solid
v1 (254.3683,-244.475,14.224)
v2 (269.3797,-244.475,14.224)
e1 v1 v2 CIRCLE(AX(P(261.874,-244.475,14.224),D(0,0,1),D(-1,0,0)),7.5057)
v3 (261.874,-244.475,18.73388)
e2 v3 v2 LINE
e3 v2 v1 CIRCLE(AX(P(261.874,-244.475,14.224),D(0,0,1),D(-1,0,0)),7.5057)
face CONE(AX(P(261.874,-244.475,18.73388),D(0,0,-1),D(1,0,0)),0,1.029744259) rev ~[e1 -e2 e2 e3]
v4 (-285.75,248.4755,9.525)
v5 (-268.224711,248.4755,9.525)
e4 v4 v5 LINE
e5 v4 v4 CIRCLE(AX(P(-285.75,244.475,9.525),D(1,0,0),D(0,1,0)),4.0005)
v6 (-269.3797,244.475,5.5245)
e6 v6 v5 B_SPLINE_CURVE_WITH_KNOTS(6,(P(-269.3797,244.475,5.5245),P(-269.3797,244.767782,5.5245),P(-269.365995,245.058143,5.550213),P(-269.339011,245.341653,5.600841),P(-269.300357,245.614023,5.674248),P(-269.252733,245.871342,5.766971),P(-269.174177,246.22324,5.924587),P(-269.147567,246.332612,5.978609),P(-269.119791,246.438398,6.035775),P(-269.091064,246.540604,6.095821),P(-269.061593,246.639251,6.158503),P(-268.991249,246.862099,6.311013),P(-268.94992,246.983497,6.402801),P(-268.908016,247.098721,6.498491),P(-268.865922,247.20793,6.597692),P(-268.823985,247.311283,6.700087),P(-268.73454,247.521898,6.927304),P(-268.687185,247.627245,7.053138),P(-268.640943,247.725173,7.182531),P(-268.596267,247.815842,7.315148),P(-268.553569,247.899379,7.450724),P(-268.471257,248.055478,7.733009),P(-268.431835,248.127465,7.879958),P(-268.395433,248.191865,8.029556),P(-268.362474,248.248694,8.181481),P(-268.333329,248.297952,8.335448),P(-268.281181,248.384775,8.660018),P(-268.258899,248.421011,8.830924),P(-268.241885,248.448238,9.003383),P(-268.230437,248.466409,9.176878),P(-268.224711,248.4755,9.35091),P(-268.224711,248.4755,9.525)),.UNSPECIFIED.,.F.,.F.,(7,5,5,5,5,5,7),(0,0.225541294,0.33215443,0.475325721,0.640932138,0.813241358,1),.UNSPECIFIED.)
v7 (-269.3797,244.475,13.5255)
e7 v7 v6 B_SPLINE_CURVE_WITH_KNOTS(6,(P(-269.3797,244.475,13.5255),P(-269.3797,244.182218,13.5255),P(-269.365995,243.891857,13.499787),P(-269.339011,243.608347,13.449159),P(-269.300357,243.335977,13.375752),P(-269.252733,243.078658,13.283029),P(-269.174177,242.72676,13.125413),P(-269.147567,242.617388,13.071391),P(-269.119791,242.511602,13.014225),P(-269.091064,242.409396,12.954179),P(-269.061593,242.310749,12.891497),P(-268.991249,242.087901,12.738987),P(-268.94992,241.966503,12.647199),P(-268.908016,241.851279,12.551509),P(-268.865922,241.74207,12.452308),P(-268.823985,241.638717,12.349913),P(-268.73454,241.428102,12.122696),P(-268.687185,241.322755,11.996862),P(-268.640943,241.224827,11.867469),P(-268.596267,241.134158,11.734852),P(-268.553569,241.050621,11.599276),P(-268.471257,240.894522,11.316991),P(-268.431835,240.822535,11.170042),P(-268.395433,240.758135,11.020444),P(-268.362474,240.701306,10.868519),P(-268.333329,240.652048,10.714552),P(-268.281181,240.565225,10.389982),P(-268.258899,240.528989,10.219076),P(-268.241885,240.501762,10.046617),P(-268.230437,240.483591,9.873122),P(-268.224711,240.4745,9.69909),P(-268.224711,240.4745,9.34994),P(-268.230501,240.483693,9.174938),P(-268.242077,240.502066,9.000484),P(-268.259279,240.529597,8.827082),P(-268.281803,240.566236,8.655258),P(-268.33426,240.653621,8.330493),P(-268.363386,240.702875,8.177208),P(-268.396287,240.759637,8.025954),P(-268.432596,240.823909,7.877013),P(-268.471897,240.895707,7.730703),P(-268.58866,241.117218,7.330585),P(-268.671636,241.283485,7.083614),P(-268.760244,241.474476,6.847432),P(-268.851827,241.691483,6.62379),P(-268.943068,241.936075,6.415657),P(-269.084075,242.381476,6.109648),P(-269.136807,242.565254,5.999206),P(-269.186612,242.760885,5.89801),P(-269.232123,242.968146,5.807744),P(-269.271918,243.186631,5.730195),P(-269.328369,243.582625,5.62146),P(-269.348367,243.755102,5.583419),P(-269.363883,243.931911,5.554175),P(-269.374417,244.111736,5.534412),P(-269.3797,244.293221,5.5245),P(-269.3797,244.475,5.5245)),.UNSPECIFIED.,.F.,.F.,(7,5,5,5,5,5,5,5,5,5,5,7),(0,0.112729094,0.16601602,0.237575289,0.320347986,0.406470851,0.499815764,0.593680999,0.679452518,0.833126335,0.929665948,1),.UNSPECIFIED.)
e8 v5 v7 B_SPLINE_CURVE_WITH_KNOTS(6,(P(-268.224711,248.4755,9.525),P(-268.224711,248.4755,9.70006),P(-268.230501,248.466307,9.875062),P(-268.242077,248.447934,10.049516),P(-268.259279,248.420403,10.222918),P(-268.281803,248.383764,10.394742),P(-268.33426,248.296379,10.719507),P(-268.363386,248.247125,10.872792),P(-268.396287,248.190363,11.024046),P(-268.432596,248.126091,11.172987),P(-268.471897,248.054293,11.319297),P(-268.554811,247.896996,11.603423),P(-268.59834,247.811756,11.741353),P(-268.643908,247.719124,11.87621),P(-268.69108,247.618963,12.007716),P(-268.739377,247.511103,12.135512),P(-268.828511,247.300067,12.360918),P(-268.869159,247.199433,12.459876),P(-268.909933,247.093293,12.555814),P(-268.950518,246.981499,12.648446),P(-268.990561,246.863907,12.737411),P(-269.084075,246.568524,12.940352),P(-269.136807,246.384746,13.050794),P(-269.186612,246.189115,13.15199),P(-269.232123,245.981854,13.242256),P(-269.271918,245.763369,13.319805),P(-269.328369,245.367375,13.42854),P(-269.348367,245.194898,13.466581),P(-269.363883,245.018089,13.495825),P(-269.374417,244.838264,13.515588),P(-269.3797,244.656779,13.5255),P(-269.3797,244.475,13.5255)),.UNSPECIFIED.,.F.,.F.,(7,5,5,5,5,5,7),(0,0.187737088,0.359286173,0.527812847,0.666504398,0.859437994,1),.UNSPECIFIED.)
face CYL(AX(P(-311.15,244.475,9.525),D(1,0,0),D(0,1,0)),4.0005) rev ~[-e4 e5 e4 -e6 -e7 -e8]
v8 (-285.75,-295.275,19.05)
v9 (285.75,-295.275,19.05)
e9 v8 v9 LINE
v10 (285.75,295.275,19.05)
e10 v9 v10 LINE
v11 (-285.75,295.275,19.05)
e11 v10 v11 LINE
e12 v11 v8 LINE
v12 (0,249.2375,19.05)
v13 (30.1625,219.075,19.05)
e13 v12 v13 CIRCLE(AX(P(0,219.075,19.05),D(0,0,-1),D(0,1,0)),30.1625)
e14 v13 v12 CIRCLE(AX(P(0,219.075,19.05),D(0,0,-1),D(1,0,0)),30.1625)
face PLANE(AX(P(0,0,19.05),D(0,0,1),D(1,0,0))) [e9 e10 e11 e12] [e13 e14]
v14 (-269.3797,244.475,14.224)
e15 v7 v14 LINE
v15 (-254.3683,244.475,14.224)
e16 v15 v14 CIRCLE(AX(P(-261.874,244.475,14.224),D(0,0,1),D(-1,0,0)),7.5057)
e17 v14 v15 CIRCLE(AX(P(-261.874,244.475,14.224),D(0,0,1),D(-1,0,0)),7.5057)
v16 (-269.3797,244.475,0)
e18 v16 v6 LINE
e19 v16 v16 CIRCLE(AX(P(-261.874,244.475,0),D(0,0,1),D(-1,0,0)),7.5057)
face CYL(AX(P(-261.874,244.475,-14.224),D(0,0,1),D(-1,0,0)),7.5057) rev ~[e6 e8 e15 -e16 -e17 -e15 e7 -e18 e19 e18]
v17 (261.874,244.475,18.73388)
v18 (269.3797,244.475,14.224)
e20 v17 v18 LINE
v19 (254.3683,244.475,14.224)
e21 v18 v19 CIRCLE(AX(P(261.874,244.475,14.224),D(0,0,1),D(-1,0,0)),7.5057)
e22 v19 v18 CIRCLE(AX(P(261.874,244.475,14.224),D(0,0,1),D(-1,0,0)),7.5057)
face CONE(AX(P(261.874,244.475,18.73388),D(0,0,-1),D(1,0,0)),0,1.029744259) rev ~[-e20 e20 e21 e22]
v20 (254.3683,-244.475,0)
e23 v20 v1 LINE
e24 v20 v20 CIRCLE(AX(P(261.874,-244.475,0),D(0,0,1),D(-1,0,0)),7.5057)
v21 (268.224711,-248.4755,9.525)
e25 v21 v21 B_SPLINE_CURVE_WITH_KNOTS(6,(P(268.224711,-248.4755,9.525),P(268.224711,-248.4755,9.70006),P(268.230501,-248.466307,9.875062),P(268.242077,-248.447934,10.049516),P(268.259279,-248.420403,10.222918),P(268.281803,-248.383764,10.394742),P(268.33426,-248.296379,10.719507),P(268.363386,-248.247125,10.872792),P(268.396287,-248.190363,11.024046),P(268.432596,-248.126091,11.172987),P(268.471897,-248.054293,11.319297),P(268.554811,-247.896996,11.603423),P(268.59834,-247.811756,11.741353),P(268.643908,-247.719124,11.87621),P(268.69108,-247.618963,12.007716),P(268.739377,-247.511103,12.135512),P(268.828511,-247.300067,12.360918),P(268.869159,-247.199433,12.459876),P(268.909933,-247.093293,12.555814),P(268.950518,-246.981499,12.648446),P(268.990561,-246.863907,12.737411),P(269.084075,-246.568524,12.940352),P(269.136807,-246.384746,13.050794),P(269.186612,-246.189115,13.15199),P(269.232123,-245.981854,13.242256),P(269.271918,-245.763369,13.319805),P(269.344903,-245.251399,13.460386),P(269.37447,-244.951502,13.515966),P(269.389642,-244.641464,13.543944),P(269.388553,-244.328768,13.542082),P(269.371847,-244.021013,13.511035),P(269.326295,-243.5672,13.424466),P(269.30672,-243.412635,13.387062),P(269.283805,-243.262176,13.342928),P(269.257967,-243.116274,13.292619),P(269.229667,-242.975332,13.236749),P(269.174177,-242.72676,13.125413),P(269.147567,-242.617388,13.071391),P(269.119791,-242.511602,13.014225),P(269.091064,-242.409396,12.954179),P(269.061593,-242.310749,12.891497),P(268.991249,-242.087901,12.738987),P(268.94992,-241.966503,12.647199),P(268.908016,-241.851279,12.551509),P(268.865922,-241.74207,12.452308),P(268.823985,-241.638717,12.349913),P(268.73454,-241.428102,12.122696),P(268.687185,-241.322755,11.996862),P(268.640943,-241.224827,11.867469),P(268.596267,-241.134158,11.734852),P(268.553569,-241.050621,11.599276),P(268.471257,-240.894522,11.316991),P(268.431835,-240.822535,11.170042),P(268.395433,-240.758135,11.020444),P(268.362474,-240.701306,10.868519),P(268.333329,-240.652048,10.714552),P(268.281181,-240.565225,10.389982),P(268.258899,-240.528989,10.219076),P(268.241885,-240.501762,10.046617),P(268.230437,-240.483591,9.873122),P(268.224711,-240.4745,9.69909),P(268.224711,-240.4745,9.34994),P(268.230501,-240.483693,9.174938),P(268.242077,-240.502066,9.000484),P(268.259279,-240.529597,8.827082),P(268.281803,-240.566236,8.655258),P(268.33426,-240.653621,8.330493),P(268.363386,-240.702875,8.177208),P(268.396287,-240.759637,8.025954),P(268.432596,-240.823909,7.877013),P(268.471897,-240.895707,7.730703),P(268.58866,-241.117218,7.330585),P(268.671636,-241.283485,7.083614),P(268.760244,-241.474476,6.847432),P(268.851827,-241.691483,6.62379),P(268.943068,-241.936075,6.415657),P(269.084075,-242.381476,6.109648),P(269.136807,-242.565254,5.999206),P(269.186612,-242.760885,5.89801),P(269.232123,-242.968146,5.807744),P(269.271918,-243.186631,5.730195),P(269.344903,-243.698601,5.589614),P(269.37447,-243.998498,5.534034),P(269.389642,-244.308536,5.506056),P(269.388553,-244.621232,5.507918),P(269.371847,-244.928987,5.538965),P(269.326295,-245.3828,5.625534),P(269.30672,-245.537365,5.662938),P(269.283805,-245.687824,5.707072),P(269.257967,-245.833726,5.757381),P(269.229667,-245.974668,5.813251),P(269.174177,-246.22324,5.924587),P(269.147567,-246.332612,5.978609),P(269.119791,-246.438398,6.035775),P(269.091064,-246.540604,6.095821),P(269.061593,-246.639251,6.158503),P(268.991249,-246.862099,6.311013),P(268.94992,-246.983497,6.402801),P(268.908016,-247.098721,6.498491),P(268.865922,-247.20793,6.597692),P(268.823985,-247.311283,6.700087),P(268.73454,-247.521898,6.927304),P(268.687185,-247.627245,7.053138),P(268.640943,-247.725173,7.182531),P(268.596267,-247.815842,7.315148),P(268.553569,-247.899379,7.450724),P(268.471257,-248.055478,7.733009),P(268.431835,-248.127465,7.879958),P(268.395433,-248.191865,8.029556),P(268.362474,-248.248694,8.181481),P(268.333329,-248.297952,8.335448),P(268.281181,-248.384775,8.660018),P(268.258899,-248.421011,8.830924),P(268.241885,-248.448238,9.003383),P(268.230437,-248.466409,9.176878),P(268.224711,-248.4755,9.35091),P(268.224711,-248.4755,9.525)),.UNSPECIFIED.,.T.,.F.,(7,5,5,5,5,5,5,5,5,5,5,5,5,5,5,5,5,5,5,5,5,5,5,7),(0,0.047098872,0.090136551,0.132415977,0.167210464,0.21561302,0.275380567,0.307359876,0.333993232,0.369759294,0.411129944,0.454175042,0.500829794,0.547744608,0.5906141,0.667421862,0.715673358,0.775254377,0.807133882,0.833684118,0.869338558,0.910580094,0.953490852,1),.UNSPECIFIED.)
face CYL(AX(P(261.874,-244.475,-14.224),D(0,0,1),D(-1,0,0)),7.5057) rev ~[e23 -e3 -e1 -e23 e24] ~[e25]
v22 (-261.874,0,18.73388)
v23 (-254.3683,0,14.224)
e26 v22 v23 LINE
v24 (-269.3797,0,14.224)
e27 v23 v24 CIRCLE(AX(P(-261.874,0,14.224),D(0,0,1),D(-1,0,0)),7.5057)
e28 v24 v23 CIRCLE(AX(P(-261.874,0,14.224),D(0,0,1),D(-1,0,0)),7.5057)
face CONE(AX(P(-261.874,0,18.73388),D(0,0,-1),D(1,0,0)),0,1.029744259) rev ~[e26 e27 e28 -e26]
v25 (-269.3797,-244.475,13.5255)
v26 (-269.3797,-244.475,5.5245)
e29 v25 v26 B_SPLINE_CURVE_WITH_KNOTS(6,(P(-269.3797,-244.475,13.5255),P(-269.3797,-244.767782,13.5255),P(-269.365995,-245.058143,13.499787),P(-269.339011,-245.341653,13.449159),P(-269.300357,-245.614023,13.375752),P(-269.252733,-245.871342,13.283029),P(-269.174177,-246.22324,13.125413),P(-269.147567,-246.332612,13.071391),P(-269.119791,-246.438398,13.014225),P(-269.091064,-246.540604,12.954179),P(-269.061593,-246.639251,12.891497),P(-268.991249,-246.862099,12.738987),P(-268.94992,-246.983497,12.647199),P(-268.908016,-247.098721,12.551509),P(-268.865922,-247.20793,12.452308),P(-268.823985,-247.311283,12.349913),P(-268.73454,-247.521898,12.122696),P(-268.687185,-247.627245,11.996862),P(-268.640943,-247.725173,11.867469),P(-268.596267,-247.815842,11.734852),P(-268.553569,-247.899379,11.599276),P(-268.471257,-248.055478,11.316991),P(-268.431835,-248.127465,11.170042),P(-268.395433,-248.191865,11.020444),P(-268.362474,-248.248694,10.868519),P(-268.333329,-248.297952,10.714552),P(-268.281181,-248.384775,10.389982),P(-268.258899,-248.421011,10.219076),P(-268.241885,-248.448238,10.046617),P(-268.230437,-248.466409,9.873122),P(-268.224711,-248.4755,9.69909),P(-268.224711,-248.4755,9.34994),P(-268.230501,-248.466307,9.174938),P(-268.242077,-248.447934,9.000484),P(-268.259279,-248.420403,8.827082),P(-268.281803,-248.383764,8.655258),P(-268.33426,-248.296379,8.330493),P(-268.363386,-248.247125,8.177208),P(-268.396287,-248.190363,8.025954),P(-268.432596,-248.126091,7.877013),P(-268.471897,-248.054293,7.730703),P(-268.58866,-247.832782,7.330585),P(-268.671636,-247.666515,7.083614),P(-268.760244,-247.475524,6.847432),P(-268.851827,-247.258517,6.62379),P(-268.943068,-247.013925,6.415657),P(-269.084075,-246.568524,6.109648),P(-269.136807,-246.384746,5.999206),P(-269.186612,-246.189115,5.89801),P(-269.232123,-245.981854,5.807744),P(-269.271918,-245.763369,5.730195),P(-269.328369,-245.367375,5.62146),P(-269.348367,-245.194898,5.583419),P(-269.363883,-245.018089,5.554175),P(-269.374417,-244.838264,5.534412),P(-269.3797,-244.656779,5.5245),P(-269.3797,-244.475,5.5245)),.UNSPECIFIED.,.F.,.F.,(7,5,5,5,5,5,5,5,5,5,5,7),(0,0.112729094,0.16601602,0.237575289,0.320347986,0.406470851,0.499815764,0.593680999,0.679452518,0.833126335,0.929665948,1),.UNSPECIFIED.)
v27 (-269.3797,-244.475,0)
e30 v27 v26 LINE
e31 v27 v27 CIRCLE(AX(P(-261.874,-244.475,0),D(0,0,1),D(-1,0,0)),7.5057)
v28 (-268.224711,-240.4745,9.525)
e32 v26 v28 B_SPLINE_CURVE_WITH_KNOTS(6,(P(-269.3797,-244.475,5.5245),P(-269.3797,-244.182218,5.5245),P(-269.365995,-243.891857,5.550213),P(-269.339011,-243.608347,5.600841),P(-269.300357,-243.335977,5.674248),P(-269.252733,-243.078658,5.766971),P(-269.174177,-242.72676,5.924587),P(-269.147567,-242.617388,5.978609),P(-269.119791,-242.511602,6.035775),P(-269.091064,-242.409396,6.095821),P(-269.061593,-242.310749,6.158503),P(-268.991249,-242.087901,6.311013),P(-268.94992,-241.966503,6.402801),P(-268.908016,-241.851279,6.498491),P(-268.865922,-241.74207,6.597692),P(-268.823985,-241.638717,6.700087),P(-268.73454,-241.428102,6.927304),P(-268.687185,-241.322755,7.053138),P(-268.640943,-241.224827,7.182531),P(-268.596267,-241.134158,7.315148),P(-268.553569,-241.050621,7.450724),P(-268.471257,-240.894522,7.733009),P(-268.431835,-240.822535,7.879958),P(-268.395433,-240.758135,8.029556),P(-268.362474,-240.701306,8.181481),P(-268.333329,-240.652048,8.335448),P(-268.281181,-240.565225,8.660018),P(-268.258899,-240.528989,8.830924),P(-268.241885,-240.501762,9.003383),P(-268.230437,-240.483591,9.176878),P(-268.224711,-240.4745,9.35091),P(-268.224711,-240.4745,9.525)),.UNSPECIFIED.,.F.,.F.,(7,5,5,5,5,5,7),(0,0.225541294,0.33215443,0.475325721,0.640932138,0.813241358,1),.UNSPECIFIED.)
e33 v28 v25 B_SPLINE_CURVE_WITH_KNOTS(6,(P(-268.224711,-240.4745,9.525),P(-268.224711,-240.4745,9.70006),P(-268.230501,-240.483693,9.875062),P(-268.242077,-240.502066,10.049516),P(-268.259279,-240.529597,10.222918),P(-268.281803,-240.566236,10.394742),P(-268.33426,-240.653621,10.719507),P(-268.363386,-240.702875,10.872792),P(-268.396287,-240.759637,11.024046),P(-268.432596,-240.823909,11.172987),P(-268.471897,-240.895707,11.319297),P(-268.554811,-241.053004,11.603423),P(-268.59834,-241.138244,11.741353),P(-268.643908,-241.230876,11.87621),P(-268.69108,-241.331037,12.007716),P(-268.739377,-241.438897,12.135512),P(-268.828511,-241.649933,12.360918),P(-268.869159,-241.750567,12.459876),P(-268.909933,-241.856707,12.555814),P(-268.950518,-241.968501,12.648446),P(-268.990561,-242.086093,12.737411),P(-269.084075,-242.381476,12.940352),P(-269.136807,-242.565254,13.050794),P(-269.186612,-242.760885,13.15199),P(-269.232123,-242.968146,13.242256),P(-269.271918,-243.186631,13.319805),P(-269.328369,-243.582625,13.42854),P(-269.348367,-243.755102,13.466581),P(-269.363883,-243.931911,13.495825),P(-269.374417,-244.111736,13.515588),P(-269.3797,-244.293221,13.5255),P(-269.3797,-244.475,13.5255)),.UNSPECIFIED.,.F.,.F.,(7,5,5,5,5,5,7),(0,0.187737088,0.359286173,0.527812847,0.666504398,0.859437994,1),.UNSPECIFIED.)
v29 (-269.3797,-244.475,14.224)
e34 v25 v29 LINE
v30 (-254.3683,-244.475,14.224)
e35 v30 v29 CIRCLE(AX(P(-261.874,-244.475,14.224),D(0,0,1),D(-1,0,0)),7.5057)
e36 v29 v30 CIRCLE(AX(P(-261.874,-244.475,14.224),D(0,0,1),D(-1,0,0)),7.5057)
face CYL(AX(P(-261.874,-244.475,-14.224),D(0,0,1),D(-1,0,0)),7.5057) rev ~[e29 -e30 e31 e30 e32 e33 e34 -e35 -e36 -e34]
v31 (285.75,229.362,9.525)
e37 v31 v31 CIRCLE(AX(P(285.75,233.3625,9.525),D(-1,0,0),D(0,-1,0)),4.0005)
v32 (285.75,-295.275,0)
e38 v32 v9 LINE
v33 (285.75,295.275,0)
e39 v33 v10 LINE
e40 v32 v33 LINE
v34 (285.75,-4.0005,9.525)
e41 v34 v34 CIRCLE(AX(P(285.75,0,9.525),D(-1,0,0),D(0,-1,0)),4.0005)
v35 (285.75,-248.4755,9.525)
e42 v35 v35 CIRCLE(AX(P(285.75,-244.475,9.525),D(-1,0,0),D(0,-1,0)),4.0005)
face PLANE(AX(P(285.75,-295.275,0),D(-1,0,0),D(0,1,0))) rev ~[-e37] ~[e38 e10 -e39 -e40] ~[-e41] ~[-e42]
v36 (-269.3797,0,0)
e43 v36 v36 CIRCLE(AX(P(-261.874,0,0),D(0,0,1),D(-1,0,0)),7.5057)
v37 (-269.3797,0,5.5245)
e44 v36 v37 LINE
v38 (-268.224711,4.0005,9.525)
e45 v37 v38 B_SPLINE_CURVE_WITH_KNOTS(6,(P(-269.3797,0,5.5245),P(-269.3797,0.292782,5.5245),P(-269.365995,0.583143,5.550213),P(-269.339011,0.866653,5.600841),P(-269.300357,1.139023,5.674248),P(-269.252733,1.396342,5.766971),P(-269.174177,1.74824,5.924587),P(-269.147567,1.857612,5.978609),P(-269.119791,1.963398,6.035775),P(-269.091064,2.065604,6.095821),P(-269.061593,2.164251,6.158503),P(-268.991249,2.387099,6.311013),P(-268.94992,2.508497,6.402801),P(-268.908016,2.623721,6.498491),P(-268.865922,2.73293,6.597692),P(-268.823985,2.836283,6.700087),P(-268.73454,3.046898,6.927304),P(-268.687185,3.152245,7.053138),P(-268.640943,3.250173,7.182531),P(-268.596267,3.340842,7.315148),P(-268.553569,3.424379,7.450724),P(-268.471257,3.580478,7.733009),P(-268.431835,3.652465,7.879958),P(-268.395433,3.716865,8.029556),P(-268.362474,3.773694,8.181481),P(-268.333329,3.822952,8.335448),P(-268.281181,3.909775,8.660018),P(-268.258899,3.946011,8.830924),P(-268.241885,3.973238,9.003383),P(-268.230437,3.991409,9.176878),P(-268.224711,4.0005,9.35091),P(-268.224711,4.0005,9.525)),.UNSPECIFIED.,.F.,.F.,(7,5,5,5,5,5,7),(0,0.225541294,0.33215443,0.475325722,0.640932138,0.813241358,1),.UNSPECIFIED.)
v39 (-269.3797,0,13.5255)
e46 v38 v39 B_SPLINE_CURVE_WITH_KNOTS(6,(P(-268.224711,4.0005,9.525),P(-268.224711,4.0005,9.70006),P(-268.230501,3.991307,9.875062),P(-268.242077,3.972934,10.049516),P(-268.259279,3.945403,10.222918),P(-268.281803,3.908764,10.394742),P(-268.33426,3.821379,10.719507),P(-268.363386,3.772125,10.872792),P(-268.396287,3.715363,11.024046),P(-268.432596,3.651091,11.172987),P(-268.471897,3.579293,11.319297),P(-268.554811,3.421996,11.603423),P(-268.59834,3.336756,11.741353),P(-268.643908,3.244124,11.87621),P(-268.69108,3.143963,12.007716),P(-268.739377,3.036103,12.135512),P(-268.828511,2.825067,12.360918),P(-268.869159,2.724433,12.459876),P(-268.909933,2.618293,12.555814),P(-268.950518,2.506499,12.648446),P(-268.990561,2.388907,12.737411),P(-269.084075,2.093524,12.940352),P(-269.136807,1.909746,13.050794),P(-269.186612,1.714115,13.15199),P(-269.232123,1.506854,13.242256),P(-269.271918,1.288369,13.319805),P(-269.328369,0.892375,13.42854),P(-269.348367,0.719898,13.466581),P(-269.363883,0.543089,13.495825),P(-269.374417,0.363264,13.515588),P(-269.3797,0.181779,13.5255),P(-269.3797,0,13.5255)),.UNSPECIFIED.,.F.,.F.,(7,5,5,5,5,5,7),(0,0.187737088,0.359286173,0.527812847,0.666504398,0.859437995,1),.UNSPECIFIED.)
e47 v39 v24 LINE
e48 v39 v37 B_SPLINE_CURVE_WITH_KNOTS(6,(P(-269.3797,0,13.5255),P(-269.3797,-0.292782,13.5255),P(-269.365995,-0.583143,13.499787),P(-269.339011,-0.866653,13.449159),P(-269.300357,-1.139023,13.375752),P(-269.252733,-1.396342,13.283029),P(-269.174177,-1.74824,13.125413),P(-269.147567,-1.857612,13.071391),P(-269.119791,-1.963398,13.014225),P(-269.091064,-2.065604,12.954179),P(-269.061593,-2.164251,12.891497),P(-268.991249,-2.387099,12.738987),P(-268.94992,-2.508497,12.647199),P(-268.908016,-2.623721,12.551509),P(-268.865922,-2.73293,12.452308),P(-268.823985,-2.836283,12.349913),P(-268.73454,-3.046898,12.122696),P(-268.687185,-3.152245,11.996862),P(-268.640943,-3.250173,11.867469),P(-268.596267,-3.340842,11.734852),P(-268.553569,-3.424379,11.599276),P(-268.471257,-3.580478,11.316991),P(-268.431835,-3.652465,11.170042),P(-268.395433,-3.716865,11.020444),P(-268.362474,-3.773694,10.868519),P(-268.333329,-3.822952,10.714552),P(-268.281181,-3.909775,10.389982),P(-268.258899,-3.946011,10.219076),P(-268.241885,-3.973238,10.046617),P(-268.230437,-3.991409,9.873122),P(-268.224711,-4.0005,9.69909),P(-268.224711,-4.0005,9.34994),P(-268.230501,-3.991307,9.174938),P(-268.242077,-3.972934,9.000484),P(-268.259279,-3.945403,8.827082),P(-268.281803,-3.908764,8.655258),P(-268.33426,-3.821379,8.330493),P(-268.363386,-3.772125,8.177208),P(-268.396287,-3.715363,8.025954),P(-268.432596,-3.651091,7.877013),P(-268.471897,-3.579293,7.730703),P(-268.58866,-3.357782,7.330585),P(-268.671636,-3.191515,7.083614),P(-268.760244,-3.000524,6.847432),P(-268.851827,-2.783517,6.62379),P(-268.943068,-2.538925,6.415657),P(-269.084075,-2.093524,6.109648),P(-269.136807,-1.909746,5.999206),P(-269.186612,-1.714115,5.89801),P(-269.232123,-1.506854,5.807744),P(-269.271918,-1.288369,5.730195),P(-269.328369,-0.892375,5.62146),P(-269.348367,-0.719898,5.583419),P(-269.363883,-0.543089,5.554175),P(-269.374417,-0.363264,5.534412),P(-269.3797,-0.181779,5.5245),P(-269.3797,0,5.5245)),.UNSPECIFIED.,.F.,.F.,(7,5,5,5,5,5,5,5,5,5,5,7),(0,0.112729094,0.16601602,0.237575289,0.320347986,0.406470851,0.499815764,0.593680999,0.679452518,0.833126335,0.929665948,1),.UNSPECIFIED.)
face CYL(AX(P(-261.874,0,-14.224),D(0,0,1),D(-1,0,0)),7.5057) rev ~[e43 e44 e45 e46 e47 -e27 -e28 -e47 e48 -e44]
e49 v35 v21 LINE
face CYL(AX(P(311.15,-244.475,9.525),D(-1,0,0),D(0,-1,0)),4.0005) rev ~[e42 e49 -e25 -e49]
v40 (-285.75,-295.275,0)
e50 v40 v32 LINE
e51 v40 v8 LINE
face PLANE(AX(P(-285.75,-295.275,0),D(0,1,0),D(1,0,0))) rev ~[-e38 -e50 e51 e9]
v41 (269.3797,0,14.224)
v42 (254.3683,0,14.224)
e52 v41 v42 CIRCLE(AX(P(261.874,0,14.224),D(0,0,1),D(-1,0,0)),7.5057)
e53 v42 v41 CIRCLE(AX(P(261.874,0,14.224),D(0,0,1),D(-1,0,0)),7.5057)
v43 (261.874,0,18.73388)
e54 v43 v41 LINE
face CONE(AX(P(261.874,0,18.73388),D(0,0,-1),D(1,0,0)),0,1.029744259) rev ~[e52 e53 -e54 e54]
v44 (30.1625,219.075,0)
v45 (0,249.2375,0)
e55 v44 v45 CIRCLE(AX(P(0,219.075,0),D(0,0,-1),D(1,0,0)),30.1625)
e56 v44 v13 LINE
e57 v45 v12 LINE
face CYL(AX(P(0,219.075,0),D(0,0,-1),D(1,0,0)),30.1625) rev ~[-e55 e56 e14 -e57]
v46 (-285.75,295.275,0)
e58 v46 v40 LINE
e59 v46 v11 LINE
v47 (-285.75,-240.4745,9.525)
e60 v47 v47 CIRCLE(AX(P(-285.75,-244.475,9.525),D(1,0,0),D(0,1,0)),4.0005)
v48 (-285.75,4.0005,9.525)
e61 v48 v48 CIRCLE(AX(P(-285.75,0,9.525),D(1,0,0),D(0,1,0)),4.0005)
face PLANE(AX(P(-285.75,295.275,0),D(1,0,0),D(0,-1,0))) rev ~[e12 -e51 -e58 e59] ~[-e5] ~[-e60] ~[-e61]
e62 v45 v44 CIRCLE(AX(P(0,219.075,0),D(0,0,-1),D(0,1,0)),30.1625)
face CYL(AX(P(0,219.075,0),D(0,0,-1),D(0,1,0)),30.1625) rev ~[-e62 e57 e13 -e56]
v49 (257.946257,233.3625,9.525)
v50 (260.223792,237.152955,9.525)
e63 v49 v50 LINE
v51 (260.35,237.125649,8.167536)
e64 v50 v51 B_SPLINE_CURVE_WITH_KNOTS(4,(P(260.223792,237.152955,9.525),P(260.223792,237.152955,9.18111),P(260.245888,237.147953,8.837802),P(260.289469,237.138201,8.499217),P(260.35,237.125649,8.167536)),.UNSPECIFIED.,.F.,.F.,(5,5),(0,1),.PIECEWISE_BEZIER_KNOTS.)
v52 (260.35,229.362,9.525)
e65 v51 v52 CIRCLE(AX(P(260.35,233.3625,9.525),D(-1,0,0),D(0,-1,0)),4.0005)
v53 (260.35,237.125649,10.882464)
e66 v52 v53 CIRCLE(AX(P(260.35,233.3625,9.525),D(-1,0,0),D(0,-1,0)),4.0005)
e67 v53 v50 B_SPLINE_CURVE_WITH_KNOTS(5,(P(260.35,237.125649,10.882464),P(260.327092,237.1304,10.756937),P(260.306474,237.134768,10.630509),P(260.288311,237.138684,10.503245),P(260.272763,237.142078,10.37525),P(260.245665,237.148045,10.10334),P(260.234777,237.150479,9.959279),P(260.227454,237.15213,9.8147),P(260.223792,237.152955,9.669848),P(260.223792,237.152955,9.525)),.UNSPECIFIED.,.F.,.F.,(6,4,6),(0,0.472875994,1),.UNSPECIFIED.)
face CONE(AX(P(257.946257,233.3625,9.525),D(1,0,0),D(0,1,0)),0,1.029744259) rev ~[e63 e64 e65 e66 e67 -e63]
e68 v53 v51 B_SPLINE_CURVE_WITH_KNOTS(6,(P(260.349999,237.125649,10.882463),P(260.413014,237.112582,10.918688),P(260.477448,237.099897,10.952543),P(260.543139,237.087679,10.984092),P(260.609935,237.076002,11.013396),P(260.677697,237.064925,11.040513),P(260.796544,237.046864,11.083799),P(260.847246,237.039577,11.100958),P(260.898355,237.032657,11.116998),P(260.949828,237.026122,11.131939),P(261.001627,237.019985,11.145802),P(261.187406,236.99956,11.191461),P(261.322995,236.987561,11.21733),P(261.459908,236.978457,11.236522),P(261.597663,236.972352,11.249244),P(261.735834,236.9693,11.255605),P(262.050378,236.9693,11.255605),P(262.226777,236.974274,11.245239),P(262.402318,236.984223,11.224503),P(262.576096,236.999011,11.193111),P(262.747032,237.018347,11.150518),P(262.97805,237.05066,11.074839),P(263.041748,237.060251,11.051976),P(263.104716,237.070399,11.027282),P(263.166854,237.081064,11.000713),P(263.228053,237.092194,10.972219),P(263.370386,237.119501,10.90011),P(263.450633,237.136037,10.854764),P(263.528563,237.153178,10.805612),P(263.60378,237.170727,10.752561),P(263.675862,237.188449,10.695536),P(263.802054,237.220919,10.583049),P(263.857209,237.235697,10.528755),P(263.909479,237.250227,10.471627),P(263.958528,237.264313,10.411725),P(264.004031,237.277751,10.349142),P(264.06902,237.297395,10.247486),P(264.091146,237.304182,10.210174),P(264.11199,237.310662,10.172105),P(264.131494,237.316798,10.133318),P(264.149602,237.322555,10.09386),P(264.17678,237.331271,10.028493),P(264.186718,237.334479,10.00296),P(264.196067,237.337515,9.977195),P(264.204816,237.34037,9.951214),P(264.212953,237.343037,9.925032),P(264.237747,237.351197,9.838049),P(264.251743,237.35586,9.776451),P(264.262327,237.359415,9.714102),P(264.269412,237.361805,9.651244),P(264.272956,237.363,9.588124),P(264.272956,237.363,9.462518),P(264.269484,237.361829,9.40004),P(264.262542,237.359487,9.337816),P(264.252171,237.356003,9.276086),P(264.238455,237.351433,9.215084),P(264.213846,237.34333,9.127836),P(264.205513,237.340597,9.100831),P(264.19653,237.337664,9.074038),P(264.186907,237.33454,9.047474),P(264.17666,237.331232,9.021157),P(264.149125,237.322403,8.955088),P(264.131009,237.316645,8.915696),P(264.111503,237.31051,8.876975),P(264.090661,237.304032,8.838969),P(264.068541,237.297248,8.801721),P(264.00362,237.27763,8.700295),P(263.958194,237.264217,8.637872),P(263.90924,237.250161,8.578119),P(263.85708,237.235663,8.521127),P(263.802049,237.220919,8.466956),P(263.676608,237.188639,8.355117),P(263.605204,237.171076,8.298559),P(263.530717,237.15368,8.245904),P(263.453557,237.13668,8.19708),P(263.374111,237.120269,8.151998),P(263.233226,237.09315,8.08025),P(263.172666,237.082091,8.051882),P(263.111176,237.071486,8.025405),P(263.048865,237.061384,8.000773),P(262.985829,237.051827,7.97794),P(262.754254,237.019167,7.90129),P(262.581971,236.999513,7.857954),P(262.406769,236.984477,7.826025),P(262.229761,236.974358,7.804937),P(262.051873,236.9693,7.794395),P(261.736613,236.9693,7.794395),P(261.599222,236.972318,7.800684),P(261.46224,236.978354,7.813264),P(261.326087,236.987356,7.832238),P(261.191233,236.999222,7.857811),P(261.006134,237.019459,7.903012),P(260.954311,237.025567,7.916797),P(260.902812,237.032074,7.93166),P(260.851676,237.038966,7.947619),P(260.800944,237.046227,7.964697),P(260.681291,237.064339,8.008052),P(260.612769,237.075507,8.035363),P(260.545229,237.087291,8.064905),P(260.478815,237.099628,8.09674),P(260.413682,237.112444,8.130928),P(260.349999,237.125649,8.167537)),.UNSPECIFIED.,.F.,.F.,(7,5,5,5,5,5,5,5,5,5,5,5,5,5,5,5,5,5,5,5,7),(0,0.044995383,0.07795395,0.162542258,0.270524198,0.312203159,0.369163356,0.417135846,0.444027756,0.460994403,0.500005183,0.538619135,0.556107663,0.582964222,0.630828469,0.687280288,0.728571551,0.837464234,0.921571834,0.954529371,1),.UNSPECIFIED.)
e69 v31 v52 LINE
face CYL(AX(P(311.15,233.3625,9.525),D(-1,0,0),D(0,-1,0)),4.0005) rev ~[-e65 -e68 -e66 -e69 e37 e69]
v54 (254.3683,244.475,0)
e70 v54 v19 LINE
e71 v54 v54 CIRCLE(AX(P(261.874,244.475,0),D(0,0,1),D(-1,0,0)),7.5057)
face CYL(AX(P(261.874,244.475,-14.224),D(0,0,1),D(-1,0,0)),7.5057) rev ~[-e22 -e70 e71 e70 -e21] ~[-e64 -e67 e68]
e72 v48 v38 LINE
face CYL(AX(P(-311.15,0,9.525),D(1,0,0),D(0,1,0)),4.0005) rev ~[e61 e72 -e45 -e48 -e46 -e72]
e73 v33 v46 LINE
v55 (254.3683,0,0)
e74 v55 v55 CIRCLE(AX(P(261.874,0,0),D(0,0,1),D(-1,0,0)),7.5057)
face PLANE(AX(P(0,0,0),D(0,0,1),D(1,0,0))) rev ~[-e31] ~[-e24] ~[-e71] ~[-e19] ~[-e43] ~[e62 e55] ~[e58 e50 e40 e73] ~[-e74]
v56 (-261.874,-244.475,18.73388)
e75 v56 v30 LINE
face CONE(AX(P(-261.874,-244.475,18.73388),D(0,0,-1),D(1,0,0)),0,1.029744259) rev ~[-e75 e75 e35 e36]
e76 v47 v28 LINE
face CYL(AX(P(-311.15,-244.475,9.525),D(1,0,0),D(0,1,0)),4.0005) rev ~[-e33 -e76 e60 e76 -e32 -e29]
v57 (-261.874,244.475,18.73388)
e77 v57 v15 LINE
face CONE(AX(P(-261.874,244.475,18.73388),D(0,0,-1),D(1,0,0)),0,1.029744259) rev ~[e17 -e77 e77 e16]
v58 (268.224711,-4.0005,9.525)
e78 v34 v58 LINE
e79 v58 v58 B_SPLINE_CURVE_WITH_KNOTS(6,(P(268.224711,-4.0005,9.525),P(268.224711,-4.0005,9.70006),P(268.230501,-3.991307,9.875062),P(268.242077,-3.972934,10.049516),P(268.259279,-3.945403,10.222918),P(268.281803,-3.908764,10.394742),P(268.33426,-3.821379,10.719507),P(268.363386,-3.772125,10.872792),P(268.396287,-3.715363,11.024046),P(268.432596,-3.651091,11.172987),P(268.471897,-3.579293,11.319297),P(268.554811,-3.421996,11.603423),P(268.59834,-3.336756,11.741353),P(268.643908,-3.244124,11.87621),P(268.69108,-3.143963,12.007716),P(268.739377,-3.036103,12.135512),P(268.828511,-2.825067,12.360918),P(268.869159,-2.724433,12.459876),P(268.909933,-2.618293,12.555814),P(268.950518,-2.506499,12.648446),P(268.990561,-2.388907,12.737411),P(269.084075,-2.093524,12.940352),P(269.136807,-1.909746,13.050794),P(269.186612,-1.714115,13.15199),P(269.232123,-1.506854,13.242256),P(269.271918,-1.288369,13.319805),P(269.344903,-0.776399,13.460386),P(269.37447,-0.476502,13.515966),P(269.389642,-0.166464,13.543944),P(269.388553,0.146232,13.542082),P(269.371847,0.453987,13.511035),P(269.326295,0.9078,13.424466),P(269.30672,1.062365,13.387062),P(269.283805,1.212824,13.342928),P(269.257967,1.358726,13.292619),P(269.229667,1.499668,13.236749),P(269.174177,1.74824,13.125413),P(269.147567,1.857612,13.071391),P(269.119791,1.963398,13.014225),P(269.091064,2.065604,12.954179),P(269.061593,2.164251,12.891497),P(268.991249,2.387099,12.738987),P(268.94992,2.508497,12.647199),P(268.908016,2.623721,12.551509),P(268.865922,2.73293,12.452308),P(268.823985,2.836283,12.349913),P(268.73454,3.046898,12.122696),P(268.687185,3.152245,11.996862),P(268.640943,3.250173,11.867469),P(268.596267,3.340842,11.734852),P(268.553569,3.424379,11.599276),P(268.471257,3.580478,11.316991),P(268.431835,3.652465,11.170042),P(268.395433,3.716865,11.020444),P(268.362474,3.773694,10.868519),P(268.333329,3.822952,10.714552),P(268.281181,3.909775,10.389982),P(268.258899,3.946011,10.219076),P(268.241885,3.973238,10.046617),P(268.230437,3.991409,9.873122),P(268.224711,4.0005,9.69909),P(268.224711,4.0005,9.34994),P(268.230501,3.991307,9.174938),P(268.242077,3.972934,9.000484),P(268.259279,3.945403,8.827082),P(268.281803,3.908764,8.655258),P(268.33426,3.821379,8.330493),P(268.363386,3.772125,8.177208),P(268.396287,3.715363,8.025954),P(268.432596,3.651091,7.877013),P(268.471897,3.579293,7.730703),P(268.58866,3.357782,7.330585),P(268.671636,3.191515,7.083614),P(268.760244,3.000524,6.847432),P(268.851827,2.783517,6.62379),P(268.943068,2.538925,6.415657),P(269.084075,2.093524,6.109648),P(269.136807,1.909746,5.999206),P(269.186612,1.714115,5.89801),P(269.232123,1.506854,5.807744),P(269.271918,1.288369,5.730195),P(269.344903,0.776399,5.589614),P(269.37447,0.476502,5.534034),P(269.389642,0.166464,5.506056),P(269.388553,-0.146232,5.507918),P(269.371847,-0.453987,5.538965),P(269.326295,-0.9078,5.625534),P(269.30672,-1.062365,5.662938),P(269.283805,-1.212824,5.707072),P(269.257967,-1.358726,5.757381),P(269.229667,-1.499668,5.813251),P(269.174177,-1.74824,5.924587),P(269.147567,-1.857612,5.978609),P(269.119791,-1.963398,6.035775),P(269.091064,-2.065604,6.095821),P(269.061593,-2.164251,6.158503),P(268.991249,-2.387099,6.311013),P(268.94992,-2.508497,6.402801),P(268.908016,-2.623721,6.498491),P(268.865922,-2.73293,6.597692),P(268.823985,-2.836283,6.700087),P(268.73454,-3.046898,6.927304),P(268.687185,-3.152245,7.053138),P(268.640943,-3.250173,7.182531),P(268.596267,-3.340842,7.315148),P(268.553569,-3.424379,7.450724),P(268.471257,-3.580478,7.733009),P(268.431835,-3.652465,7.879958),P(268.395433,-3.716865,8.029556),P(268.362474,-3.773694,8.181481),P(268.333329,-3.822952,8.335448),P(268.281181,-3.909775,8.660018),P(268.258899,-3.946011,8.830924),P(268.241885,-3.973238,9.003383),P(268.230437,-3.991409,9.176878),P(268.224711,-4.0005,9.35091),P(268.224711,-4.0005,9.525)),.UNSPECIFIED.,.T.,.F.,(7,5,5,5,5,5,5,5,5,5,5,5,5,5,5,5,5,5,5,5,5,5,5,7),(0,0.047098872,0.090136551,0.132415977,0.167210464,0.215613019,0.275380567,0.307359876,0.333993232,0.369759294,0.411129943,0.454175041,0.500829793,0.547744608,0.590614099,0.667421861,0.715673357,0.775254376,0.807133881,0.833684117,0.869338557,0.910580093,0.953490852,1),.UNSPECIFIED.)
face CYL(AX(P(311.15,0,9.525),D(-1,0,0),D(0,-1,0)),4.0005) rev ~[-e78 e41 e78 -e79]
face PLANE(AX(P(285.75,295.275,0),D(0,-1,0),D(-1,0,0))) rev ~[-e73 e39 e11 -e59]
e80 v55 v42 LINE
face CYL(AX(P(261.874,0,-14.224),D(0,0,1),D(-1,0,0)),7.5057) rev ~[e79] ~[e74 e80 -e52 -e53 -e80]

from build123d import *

# Parameters (mm, degrees)
F1_DEPTH = 19.05
F3_D     = 15.0114
F3_DEPTH = 14.224
F3_TIP   = 4.5098795482
F5_D     = 8.001
F5_DEPTH = 25.4
F5_TIP   = 2.4037429064
F7_D     = 8.001
F7_DEPTH = 25.4
F7_TIP   = 2.4037429064


# Not quite as in the source:
# - a feature names something its author has since deleted; it is built from what else it names


with BuildPart() as f1:
    # F0 (on Top) → F1 (new body)
    with BuildSketch(Plane.XY):
        Polygon((285.75, -295.275), (285.75, 295.275), (0, 295.275), (-285.75, 295.275), (-285.75, -295.275), align=None)
        with BuildLine():
            ThreePointArc((30.1625, 219.075), (-21.3281082875, 197.7468917125), (0, 249.2375))
            ThreePointArc((0, 249.2375), (21.3281082875, 240.4031082875), (30.1625, 219.075))
        make_face(mode=Mode.SUBTRACT)
    extrude(amount=F1_DEPTH)

    # F3
    with Locations(Plane(origin=(0, 0, 0), x_dir=(1, 0, 0), z_dir=(0, 0, -1))):
        with Locations((-261.874, 244.475), (261.874, 244.475), (-261.874, 0), (261.874, 0), (261.874, -244.475), (-261.874, -244.475)):
            Hole(F3_D / 2, depth=F3_DEPTH)
            with Locations((0, 0, -(F3_DEPTH + F3_TIP / 2))):  # 118° drill point
                Cone(0, F3_D / 2, F3_TIP, mode=Mode.SUBTRACT)

    # F5
    with Locations(Plane.YZ.offset(285.75)):
        with Locations((-244.475, 9.525), (0, 9.525), (233.3625, 9.525)):
            Hole(F5_D / 2, depth=F5_DEPTH)
            with Locations((0, 0, -(F5_DEPTH + F5_TIP / 2))):  # 118° drill point
                Cone(0, F5_D / 2, F5_TIP, mode=Mode.SUBTRACT)

    # F7
    with Locations(Plane(origin=(-285.75, 0, 0), x_dir=(0, -1, 0), z_dir=(-1, 0, 0))):
        with Locations((0, 9.525), (244.475, 9.525), (-244.475, 9.525)):
            Hole(F7_D / 2, depth=F7_DEPTH)
            with Locations((0, 0, -(F7_DEPTH + F7_TIP / 2))):  # 118° drill point
                Cone(0, F7_D / 2, F7_TIP, mode=Mode.SUBTRACT)


solid = f1.part
